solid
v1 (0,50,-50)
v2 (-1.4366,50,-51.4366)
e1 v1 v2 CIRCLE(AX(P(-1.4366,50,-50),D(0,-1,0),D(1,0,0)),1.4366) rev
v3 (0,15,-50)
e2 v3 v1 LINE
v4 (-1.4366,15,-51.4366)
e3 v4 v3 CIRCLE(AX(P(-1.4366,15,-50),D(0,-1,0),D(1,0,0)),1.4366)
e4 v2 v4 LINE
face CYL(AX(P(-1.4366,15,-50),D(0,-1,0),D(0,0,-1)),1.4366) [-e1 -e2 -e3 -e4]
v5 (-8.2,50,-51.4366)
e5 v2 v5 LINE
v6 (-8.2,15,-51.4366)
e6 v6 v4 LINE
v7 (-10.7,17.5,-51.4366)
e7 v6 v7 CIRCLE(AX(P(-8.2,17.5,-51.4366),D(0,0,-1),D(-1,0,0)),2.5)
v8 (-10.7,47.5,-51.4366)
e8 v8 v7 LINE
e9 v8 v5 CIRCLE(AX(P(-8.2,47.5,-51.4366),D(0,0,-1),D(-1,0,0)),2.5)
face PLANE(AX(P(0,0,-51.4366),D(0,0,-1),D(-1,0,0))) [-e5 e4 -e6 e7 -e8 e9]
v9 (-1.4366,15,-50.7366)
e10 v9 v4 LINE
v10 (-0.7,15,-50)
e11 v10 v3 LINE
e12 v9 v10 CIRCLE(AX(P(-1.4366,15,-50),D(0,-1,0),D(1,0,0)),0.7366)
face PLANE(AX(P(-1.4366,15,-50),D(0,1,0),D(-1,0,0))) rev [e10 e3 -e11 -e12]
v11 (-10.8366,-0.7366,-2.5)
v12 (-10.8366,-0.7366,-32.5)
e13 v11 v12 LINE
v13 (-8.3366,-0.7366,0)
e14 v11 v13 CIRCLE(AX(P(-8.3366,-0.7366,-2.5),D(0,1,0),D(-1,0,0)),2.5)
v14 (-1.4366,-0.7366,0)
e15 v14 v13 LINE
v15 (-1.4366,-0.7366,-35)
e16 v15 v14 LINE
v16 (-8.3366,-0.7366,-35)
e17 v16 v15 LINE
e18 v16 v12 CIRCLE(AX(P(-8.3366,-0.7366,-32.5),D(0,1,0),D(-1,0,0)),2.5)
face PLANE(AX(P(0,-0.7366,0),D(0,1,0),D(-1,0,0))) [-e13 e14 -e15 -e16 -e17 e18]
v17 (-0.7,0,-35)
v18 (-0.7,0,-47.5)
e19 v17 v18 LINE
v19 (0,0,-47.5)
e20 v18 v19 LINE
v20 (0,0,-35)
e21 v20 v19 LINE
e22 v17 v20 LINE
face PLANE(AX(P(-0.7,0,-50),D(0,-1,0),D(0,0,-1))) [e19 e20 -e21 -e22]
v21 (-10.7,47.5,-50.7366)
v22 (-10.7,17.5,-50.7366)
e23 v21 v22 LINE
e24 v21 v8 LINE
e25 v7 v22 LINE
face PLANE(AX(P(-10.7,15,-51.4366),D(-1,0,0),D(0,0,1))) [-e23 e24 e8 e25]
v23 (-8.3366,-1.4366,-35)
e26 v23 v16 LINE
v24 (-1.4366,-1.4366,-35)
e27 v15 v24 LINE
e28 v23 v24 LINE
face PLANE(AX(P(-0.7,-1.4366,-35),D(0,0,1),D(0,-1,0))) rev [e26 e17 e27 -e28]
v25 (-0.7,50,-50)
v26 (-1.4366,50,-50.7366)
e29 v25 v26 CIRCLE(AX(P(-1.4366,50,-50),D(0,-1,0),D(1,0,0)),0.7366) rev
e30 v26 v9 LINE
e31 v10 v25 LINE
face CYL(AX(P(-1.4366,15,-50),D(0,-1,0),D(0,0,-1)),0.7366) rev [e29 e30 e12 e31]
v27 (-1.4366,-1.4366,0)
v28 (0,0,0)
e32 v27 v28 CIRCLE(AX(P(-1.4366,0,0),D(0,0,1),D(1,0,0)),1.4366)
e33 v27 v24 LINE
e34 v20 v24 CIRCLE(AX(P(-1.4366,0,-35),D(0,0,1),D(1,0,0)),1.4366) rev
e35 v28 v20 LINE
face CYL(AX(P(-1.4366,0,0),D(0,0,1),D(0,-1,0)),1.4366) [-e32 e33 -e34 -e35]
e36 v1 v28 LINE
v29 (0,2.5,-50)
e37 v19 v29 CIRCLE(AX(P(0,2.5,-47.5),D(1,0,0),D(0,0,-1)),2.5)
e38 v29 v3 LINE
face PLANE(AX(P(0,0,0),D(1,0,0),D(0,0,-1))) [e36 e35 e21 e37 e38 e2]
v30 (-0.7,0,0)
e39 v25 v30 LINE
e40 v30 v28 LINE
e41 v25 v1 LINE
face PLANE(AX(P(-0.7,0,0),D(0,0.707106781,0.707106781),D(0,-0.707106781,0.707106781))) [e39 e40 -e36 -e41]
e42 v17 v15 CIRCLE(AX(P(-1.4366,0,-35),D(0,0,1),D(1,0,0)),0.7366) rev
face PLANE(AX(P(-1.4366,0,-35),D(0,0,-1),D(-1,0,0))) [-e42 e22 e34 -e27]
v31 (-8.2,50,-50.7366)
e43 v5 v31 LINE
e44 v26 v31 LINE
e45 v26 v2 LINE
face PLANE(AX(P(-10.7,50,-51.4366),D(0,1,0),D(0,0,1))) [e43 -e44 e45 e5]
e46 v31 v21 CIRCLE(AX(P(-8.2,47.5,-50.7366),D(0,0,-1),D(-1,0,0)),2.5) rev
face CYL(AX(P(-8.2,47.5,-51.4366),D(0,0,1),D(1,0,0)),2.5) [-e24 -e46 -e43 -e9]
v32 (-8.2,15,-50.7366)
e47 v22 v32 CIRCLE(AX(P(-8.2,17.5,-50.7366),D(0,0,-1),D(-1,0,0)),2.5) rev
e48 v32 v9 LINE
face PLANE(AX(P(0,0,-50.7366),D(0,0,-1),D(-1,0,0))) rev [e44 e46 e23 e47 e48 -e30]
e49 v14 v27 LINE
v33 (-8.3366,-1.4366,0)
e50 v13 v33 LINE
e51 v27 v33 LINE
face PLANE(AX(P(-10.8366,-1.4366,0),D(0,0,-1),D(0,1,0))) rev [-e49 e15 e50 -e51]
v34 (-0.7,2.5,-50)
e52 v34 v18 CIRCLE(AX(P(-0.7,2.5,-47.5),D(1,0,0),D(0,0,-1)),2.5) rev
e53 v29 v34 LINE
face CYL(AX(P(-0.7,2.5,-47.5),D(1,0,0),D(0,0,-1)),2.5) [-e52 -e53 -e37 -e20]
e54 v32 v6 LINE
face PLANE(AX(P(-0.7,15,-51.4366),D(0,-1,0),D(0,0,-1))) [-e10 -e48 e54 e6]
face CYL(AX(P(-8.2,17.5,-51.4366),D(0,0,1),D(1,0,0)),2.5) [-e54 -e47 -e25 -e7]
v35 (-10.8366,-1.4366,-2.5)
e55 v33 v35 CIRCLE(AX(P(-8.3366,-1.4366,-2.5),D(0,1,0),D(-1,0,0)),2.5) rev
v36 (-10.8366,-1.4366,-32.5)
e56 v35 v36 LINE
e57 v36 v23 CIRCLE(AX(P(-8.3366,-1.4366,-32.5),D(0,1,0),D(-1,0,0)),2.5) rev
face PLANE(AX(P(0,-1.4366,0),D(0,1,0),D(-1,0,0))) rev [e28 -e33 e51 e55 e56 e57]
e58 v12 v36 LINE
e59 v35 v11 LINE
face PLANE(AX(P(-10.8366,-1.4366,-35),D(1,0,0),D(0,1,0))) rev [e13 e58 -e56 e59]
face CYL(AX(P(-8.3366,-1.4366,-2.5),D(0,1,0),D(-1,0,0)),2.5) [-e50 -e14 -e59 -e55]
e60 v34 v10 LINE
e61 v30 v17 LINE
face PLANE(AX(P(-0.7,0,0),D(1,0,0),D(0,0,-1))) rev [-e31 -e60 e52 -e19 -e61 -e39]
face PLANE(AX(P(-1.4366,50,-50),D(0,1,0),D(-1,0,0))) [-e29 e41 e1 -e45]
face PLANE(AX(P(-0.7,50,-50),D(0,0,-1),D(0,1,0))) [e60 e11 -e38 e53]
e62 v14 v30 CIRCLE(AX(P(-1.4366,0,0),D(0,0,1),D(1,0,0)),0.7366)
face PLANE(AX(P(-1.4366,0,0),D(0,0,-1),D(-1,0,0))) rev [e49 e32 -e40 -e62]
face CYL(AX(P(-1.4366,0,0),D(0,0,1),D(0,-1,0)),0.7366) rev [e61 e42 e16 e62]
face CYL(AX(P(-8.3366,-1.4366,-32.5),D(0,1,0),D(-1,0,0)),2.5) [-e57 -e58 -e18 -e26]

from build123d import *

# Parameters (mm, degrees)
BASE_FLANGE1_DEPTH    = 0.7
EDGE_FLANGE1_DEPTH    = 35
EDGE_FLANGE2_DEPTH    = 35
BREAK_CORNER1_START   = -1.4366
BREAK_CORNER1_DEPTH   = 0.7
BREAK_CORNER1_START_2 = -0.7
BREAK_CORNER1_2_DEPTH = 0.7
BREAK_CORNER1_START_3 = -51.4366
BREAK_CORNER1_3_DEPTH = 0.7


# Read off the part's stored shape, not the designer's step: Break-Corner1
# Sheet-metal steps are written as plain solids
with BuildPart() as part:
    # Sketch1 → Base-Flange1 (new body)
    with BuildSketch(Plane(origin=(0, 0, 0), x_dir=(0, 0, -1), z_dir=(1, 0, 0))):
        Polygon((0, 0), (50, 50), (50, 0), align=None)
    extrude(amount=-BASE_FLANGE1_DEPTH)

    # Edge-Flange1 section (across the edge) → Edge-Flange1 (add)
    with BuildSketch(Plane(origin=(-0.7, 50, -50.7366), x_dir=(0, 0, 1), z_dir=(0, -1, 0))):
        with BuildLine():
            Line((-0.7, 0.7366), (-0.7, 10))
            Line((-0.7, 10), (0, 10))
            Line((0, 10), (0, 0.7366))
            ThreePointArc((0, 0.7366), (0.215745145, 0.215745145), (0.7366, 0))
            Line((0.7366, 0), (0.7366, -0.7))
            ThreePointArc((0.7366, -0.7), (-0.279229602, -0.279229602), (-0.7, 0.7366))
        make_face()
    extrude(amount=EDGE_FLANGE1_DEPTH)

    # Edge-Flange2 section (across the edge) → Edge-Flange2 (add)
    with BuildSketch(Plane(origin=(-0.7, -0.7366, -35), x_dir=(0, 1, 0), z_dir=(0, 0, 1))):
        with BuildLine():
            Line((-0.7, 0.7366), (-0.7, 10.1366))
            Line((-0.7, 10.1366), (0, 10.1366))
            Line((0, 10.1366), (0, 0.7366))
            ThreePointArc((0, 0.7366), (0.215745145, 0.215745145), (0.7366, 0))
            Line((0.7366, 0), (0.7366, -0.7))
            ThreePointArc((0.7366, -0.7), (-0.279229602, -0.279229602), (-0.7, 0.7366))
        make_face()
    extrude(amount=EDGE_FLANGE2_DEPTH)

    # Break-Corner1 outline → Break-Corner1 (cut)
    with BuildSketch(Plane(origin=(0, 0, 0), x_dir=(1, 0, 0), z_dir=(0, 1, 0)).offset(BREAK_CORNER1_START)):
        with BuildLine():
            ThreePointArc((-8.3366, 0), (-10.104366953, 0.732233047), (-10.8366, 2.5))
            Line((-10.8366, 2.5), (-10.8366, 0))
            Line((-10.8366, 0), (-8.3366, 0))
        make_face()
        with BuildLine():
            ThreePointArc((-10.8366, 32.5), (-10.104366953, 34.267766953), (-8.3366, 35))
            Line((-8.3366, 35), (-10.8366, 35))
            Line((-10.8366, 35), (-10.8366, 32.5))
        make_face()
    extrude(amount=BREAK_CORNER1_DEPTH, mode=Mode.SUBTRACT)

    # Break-Corner1 2 outline → Break-Corner1 2 (cut)
    with BuildSketch(Plane.YZ.offset(BREAK_CORNER1_START_2)):
        with BuildLine():
            ThreePointArc((2.5, -50), (0.732233047, -49.267766953), (0, -47.5))
            Line((0, -47.5), (0, -50))
            Line((0, -50), (2.5, -50))
        make_face()
    extrude(amount=BREAK_CORNER1_2_DEPTH, mode=Mode.SUBTRACT)

    # Break-Corner1 3 outline → Break-Corner1 3 (cut)
    with BuildSketch(Plane.XY.offset(BREAK_CORNER1_START_3)):
        with BuildLine():
            Line((-10.7, 50), (-10.7, 47.5))
            ThreePointArc((-10.7, 47.5), (-9.967766953, 49.267766953), (-8.2, 50))
            Line((-8.2, 50), (-10.7, 50))
        make_face()
        with BuildLine():
            ThreePointArc((-8.2, 15), (-9.967766953, 15.732233047), (-10.7, 17.5))
            Line((-10.7, 17.5), (-10.7, 15))
            Line((-10.7, 15), (-8.2, 15))
        make_face()
    extrude(amount=BREAK_CORNER1_3_DEPTH, mode=Mode.SUBTRACT)


solid = part.part
